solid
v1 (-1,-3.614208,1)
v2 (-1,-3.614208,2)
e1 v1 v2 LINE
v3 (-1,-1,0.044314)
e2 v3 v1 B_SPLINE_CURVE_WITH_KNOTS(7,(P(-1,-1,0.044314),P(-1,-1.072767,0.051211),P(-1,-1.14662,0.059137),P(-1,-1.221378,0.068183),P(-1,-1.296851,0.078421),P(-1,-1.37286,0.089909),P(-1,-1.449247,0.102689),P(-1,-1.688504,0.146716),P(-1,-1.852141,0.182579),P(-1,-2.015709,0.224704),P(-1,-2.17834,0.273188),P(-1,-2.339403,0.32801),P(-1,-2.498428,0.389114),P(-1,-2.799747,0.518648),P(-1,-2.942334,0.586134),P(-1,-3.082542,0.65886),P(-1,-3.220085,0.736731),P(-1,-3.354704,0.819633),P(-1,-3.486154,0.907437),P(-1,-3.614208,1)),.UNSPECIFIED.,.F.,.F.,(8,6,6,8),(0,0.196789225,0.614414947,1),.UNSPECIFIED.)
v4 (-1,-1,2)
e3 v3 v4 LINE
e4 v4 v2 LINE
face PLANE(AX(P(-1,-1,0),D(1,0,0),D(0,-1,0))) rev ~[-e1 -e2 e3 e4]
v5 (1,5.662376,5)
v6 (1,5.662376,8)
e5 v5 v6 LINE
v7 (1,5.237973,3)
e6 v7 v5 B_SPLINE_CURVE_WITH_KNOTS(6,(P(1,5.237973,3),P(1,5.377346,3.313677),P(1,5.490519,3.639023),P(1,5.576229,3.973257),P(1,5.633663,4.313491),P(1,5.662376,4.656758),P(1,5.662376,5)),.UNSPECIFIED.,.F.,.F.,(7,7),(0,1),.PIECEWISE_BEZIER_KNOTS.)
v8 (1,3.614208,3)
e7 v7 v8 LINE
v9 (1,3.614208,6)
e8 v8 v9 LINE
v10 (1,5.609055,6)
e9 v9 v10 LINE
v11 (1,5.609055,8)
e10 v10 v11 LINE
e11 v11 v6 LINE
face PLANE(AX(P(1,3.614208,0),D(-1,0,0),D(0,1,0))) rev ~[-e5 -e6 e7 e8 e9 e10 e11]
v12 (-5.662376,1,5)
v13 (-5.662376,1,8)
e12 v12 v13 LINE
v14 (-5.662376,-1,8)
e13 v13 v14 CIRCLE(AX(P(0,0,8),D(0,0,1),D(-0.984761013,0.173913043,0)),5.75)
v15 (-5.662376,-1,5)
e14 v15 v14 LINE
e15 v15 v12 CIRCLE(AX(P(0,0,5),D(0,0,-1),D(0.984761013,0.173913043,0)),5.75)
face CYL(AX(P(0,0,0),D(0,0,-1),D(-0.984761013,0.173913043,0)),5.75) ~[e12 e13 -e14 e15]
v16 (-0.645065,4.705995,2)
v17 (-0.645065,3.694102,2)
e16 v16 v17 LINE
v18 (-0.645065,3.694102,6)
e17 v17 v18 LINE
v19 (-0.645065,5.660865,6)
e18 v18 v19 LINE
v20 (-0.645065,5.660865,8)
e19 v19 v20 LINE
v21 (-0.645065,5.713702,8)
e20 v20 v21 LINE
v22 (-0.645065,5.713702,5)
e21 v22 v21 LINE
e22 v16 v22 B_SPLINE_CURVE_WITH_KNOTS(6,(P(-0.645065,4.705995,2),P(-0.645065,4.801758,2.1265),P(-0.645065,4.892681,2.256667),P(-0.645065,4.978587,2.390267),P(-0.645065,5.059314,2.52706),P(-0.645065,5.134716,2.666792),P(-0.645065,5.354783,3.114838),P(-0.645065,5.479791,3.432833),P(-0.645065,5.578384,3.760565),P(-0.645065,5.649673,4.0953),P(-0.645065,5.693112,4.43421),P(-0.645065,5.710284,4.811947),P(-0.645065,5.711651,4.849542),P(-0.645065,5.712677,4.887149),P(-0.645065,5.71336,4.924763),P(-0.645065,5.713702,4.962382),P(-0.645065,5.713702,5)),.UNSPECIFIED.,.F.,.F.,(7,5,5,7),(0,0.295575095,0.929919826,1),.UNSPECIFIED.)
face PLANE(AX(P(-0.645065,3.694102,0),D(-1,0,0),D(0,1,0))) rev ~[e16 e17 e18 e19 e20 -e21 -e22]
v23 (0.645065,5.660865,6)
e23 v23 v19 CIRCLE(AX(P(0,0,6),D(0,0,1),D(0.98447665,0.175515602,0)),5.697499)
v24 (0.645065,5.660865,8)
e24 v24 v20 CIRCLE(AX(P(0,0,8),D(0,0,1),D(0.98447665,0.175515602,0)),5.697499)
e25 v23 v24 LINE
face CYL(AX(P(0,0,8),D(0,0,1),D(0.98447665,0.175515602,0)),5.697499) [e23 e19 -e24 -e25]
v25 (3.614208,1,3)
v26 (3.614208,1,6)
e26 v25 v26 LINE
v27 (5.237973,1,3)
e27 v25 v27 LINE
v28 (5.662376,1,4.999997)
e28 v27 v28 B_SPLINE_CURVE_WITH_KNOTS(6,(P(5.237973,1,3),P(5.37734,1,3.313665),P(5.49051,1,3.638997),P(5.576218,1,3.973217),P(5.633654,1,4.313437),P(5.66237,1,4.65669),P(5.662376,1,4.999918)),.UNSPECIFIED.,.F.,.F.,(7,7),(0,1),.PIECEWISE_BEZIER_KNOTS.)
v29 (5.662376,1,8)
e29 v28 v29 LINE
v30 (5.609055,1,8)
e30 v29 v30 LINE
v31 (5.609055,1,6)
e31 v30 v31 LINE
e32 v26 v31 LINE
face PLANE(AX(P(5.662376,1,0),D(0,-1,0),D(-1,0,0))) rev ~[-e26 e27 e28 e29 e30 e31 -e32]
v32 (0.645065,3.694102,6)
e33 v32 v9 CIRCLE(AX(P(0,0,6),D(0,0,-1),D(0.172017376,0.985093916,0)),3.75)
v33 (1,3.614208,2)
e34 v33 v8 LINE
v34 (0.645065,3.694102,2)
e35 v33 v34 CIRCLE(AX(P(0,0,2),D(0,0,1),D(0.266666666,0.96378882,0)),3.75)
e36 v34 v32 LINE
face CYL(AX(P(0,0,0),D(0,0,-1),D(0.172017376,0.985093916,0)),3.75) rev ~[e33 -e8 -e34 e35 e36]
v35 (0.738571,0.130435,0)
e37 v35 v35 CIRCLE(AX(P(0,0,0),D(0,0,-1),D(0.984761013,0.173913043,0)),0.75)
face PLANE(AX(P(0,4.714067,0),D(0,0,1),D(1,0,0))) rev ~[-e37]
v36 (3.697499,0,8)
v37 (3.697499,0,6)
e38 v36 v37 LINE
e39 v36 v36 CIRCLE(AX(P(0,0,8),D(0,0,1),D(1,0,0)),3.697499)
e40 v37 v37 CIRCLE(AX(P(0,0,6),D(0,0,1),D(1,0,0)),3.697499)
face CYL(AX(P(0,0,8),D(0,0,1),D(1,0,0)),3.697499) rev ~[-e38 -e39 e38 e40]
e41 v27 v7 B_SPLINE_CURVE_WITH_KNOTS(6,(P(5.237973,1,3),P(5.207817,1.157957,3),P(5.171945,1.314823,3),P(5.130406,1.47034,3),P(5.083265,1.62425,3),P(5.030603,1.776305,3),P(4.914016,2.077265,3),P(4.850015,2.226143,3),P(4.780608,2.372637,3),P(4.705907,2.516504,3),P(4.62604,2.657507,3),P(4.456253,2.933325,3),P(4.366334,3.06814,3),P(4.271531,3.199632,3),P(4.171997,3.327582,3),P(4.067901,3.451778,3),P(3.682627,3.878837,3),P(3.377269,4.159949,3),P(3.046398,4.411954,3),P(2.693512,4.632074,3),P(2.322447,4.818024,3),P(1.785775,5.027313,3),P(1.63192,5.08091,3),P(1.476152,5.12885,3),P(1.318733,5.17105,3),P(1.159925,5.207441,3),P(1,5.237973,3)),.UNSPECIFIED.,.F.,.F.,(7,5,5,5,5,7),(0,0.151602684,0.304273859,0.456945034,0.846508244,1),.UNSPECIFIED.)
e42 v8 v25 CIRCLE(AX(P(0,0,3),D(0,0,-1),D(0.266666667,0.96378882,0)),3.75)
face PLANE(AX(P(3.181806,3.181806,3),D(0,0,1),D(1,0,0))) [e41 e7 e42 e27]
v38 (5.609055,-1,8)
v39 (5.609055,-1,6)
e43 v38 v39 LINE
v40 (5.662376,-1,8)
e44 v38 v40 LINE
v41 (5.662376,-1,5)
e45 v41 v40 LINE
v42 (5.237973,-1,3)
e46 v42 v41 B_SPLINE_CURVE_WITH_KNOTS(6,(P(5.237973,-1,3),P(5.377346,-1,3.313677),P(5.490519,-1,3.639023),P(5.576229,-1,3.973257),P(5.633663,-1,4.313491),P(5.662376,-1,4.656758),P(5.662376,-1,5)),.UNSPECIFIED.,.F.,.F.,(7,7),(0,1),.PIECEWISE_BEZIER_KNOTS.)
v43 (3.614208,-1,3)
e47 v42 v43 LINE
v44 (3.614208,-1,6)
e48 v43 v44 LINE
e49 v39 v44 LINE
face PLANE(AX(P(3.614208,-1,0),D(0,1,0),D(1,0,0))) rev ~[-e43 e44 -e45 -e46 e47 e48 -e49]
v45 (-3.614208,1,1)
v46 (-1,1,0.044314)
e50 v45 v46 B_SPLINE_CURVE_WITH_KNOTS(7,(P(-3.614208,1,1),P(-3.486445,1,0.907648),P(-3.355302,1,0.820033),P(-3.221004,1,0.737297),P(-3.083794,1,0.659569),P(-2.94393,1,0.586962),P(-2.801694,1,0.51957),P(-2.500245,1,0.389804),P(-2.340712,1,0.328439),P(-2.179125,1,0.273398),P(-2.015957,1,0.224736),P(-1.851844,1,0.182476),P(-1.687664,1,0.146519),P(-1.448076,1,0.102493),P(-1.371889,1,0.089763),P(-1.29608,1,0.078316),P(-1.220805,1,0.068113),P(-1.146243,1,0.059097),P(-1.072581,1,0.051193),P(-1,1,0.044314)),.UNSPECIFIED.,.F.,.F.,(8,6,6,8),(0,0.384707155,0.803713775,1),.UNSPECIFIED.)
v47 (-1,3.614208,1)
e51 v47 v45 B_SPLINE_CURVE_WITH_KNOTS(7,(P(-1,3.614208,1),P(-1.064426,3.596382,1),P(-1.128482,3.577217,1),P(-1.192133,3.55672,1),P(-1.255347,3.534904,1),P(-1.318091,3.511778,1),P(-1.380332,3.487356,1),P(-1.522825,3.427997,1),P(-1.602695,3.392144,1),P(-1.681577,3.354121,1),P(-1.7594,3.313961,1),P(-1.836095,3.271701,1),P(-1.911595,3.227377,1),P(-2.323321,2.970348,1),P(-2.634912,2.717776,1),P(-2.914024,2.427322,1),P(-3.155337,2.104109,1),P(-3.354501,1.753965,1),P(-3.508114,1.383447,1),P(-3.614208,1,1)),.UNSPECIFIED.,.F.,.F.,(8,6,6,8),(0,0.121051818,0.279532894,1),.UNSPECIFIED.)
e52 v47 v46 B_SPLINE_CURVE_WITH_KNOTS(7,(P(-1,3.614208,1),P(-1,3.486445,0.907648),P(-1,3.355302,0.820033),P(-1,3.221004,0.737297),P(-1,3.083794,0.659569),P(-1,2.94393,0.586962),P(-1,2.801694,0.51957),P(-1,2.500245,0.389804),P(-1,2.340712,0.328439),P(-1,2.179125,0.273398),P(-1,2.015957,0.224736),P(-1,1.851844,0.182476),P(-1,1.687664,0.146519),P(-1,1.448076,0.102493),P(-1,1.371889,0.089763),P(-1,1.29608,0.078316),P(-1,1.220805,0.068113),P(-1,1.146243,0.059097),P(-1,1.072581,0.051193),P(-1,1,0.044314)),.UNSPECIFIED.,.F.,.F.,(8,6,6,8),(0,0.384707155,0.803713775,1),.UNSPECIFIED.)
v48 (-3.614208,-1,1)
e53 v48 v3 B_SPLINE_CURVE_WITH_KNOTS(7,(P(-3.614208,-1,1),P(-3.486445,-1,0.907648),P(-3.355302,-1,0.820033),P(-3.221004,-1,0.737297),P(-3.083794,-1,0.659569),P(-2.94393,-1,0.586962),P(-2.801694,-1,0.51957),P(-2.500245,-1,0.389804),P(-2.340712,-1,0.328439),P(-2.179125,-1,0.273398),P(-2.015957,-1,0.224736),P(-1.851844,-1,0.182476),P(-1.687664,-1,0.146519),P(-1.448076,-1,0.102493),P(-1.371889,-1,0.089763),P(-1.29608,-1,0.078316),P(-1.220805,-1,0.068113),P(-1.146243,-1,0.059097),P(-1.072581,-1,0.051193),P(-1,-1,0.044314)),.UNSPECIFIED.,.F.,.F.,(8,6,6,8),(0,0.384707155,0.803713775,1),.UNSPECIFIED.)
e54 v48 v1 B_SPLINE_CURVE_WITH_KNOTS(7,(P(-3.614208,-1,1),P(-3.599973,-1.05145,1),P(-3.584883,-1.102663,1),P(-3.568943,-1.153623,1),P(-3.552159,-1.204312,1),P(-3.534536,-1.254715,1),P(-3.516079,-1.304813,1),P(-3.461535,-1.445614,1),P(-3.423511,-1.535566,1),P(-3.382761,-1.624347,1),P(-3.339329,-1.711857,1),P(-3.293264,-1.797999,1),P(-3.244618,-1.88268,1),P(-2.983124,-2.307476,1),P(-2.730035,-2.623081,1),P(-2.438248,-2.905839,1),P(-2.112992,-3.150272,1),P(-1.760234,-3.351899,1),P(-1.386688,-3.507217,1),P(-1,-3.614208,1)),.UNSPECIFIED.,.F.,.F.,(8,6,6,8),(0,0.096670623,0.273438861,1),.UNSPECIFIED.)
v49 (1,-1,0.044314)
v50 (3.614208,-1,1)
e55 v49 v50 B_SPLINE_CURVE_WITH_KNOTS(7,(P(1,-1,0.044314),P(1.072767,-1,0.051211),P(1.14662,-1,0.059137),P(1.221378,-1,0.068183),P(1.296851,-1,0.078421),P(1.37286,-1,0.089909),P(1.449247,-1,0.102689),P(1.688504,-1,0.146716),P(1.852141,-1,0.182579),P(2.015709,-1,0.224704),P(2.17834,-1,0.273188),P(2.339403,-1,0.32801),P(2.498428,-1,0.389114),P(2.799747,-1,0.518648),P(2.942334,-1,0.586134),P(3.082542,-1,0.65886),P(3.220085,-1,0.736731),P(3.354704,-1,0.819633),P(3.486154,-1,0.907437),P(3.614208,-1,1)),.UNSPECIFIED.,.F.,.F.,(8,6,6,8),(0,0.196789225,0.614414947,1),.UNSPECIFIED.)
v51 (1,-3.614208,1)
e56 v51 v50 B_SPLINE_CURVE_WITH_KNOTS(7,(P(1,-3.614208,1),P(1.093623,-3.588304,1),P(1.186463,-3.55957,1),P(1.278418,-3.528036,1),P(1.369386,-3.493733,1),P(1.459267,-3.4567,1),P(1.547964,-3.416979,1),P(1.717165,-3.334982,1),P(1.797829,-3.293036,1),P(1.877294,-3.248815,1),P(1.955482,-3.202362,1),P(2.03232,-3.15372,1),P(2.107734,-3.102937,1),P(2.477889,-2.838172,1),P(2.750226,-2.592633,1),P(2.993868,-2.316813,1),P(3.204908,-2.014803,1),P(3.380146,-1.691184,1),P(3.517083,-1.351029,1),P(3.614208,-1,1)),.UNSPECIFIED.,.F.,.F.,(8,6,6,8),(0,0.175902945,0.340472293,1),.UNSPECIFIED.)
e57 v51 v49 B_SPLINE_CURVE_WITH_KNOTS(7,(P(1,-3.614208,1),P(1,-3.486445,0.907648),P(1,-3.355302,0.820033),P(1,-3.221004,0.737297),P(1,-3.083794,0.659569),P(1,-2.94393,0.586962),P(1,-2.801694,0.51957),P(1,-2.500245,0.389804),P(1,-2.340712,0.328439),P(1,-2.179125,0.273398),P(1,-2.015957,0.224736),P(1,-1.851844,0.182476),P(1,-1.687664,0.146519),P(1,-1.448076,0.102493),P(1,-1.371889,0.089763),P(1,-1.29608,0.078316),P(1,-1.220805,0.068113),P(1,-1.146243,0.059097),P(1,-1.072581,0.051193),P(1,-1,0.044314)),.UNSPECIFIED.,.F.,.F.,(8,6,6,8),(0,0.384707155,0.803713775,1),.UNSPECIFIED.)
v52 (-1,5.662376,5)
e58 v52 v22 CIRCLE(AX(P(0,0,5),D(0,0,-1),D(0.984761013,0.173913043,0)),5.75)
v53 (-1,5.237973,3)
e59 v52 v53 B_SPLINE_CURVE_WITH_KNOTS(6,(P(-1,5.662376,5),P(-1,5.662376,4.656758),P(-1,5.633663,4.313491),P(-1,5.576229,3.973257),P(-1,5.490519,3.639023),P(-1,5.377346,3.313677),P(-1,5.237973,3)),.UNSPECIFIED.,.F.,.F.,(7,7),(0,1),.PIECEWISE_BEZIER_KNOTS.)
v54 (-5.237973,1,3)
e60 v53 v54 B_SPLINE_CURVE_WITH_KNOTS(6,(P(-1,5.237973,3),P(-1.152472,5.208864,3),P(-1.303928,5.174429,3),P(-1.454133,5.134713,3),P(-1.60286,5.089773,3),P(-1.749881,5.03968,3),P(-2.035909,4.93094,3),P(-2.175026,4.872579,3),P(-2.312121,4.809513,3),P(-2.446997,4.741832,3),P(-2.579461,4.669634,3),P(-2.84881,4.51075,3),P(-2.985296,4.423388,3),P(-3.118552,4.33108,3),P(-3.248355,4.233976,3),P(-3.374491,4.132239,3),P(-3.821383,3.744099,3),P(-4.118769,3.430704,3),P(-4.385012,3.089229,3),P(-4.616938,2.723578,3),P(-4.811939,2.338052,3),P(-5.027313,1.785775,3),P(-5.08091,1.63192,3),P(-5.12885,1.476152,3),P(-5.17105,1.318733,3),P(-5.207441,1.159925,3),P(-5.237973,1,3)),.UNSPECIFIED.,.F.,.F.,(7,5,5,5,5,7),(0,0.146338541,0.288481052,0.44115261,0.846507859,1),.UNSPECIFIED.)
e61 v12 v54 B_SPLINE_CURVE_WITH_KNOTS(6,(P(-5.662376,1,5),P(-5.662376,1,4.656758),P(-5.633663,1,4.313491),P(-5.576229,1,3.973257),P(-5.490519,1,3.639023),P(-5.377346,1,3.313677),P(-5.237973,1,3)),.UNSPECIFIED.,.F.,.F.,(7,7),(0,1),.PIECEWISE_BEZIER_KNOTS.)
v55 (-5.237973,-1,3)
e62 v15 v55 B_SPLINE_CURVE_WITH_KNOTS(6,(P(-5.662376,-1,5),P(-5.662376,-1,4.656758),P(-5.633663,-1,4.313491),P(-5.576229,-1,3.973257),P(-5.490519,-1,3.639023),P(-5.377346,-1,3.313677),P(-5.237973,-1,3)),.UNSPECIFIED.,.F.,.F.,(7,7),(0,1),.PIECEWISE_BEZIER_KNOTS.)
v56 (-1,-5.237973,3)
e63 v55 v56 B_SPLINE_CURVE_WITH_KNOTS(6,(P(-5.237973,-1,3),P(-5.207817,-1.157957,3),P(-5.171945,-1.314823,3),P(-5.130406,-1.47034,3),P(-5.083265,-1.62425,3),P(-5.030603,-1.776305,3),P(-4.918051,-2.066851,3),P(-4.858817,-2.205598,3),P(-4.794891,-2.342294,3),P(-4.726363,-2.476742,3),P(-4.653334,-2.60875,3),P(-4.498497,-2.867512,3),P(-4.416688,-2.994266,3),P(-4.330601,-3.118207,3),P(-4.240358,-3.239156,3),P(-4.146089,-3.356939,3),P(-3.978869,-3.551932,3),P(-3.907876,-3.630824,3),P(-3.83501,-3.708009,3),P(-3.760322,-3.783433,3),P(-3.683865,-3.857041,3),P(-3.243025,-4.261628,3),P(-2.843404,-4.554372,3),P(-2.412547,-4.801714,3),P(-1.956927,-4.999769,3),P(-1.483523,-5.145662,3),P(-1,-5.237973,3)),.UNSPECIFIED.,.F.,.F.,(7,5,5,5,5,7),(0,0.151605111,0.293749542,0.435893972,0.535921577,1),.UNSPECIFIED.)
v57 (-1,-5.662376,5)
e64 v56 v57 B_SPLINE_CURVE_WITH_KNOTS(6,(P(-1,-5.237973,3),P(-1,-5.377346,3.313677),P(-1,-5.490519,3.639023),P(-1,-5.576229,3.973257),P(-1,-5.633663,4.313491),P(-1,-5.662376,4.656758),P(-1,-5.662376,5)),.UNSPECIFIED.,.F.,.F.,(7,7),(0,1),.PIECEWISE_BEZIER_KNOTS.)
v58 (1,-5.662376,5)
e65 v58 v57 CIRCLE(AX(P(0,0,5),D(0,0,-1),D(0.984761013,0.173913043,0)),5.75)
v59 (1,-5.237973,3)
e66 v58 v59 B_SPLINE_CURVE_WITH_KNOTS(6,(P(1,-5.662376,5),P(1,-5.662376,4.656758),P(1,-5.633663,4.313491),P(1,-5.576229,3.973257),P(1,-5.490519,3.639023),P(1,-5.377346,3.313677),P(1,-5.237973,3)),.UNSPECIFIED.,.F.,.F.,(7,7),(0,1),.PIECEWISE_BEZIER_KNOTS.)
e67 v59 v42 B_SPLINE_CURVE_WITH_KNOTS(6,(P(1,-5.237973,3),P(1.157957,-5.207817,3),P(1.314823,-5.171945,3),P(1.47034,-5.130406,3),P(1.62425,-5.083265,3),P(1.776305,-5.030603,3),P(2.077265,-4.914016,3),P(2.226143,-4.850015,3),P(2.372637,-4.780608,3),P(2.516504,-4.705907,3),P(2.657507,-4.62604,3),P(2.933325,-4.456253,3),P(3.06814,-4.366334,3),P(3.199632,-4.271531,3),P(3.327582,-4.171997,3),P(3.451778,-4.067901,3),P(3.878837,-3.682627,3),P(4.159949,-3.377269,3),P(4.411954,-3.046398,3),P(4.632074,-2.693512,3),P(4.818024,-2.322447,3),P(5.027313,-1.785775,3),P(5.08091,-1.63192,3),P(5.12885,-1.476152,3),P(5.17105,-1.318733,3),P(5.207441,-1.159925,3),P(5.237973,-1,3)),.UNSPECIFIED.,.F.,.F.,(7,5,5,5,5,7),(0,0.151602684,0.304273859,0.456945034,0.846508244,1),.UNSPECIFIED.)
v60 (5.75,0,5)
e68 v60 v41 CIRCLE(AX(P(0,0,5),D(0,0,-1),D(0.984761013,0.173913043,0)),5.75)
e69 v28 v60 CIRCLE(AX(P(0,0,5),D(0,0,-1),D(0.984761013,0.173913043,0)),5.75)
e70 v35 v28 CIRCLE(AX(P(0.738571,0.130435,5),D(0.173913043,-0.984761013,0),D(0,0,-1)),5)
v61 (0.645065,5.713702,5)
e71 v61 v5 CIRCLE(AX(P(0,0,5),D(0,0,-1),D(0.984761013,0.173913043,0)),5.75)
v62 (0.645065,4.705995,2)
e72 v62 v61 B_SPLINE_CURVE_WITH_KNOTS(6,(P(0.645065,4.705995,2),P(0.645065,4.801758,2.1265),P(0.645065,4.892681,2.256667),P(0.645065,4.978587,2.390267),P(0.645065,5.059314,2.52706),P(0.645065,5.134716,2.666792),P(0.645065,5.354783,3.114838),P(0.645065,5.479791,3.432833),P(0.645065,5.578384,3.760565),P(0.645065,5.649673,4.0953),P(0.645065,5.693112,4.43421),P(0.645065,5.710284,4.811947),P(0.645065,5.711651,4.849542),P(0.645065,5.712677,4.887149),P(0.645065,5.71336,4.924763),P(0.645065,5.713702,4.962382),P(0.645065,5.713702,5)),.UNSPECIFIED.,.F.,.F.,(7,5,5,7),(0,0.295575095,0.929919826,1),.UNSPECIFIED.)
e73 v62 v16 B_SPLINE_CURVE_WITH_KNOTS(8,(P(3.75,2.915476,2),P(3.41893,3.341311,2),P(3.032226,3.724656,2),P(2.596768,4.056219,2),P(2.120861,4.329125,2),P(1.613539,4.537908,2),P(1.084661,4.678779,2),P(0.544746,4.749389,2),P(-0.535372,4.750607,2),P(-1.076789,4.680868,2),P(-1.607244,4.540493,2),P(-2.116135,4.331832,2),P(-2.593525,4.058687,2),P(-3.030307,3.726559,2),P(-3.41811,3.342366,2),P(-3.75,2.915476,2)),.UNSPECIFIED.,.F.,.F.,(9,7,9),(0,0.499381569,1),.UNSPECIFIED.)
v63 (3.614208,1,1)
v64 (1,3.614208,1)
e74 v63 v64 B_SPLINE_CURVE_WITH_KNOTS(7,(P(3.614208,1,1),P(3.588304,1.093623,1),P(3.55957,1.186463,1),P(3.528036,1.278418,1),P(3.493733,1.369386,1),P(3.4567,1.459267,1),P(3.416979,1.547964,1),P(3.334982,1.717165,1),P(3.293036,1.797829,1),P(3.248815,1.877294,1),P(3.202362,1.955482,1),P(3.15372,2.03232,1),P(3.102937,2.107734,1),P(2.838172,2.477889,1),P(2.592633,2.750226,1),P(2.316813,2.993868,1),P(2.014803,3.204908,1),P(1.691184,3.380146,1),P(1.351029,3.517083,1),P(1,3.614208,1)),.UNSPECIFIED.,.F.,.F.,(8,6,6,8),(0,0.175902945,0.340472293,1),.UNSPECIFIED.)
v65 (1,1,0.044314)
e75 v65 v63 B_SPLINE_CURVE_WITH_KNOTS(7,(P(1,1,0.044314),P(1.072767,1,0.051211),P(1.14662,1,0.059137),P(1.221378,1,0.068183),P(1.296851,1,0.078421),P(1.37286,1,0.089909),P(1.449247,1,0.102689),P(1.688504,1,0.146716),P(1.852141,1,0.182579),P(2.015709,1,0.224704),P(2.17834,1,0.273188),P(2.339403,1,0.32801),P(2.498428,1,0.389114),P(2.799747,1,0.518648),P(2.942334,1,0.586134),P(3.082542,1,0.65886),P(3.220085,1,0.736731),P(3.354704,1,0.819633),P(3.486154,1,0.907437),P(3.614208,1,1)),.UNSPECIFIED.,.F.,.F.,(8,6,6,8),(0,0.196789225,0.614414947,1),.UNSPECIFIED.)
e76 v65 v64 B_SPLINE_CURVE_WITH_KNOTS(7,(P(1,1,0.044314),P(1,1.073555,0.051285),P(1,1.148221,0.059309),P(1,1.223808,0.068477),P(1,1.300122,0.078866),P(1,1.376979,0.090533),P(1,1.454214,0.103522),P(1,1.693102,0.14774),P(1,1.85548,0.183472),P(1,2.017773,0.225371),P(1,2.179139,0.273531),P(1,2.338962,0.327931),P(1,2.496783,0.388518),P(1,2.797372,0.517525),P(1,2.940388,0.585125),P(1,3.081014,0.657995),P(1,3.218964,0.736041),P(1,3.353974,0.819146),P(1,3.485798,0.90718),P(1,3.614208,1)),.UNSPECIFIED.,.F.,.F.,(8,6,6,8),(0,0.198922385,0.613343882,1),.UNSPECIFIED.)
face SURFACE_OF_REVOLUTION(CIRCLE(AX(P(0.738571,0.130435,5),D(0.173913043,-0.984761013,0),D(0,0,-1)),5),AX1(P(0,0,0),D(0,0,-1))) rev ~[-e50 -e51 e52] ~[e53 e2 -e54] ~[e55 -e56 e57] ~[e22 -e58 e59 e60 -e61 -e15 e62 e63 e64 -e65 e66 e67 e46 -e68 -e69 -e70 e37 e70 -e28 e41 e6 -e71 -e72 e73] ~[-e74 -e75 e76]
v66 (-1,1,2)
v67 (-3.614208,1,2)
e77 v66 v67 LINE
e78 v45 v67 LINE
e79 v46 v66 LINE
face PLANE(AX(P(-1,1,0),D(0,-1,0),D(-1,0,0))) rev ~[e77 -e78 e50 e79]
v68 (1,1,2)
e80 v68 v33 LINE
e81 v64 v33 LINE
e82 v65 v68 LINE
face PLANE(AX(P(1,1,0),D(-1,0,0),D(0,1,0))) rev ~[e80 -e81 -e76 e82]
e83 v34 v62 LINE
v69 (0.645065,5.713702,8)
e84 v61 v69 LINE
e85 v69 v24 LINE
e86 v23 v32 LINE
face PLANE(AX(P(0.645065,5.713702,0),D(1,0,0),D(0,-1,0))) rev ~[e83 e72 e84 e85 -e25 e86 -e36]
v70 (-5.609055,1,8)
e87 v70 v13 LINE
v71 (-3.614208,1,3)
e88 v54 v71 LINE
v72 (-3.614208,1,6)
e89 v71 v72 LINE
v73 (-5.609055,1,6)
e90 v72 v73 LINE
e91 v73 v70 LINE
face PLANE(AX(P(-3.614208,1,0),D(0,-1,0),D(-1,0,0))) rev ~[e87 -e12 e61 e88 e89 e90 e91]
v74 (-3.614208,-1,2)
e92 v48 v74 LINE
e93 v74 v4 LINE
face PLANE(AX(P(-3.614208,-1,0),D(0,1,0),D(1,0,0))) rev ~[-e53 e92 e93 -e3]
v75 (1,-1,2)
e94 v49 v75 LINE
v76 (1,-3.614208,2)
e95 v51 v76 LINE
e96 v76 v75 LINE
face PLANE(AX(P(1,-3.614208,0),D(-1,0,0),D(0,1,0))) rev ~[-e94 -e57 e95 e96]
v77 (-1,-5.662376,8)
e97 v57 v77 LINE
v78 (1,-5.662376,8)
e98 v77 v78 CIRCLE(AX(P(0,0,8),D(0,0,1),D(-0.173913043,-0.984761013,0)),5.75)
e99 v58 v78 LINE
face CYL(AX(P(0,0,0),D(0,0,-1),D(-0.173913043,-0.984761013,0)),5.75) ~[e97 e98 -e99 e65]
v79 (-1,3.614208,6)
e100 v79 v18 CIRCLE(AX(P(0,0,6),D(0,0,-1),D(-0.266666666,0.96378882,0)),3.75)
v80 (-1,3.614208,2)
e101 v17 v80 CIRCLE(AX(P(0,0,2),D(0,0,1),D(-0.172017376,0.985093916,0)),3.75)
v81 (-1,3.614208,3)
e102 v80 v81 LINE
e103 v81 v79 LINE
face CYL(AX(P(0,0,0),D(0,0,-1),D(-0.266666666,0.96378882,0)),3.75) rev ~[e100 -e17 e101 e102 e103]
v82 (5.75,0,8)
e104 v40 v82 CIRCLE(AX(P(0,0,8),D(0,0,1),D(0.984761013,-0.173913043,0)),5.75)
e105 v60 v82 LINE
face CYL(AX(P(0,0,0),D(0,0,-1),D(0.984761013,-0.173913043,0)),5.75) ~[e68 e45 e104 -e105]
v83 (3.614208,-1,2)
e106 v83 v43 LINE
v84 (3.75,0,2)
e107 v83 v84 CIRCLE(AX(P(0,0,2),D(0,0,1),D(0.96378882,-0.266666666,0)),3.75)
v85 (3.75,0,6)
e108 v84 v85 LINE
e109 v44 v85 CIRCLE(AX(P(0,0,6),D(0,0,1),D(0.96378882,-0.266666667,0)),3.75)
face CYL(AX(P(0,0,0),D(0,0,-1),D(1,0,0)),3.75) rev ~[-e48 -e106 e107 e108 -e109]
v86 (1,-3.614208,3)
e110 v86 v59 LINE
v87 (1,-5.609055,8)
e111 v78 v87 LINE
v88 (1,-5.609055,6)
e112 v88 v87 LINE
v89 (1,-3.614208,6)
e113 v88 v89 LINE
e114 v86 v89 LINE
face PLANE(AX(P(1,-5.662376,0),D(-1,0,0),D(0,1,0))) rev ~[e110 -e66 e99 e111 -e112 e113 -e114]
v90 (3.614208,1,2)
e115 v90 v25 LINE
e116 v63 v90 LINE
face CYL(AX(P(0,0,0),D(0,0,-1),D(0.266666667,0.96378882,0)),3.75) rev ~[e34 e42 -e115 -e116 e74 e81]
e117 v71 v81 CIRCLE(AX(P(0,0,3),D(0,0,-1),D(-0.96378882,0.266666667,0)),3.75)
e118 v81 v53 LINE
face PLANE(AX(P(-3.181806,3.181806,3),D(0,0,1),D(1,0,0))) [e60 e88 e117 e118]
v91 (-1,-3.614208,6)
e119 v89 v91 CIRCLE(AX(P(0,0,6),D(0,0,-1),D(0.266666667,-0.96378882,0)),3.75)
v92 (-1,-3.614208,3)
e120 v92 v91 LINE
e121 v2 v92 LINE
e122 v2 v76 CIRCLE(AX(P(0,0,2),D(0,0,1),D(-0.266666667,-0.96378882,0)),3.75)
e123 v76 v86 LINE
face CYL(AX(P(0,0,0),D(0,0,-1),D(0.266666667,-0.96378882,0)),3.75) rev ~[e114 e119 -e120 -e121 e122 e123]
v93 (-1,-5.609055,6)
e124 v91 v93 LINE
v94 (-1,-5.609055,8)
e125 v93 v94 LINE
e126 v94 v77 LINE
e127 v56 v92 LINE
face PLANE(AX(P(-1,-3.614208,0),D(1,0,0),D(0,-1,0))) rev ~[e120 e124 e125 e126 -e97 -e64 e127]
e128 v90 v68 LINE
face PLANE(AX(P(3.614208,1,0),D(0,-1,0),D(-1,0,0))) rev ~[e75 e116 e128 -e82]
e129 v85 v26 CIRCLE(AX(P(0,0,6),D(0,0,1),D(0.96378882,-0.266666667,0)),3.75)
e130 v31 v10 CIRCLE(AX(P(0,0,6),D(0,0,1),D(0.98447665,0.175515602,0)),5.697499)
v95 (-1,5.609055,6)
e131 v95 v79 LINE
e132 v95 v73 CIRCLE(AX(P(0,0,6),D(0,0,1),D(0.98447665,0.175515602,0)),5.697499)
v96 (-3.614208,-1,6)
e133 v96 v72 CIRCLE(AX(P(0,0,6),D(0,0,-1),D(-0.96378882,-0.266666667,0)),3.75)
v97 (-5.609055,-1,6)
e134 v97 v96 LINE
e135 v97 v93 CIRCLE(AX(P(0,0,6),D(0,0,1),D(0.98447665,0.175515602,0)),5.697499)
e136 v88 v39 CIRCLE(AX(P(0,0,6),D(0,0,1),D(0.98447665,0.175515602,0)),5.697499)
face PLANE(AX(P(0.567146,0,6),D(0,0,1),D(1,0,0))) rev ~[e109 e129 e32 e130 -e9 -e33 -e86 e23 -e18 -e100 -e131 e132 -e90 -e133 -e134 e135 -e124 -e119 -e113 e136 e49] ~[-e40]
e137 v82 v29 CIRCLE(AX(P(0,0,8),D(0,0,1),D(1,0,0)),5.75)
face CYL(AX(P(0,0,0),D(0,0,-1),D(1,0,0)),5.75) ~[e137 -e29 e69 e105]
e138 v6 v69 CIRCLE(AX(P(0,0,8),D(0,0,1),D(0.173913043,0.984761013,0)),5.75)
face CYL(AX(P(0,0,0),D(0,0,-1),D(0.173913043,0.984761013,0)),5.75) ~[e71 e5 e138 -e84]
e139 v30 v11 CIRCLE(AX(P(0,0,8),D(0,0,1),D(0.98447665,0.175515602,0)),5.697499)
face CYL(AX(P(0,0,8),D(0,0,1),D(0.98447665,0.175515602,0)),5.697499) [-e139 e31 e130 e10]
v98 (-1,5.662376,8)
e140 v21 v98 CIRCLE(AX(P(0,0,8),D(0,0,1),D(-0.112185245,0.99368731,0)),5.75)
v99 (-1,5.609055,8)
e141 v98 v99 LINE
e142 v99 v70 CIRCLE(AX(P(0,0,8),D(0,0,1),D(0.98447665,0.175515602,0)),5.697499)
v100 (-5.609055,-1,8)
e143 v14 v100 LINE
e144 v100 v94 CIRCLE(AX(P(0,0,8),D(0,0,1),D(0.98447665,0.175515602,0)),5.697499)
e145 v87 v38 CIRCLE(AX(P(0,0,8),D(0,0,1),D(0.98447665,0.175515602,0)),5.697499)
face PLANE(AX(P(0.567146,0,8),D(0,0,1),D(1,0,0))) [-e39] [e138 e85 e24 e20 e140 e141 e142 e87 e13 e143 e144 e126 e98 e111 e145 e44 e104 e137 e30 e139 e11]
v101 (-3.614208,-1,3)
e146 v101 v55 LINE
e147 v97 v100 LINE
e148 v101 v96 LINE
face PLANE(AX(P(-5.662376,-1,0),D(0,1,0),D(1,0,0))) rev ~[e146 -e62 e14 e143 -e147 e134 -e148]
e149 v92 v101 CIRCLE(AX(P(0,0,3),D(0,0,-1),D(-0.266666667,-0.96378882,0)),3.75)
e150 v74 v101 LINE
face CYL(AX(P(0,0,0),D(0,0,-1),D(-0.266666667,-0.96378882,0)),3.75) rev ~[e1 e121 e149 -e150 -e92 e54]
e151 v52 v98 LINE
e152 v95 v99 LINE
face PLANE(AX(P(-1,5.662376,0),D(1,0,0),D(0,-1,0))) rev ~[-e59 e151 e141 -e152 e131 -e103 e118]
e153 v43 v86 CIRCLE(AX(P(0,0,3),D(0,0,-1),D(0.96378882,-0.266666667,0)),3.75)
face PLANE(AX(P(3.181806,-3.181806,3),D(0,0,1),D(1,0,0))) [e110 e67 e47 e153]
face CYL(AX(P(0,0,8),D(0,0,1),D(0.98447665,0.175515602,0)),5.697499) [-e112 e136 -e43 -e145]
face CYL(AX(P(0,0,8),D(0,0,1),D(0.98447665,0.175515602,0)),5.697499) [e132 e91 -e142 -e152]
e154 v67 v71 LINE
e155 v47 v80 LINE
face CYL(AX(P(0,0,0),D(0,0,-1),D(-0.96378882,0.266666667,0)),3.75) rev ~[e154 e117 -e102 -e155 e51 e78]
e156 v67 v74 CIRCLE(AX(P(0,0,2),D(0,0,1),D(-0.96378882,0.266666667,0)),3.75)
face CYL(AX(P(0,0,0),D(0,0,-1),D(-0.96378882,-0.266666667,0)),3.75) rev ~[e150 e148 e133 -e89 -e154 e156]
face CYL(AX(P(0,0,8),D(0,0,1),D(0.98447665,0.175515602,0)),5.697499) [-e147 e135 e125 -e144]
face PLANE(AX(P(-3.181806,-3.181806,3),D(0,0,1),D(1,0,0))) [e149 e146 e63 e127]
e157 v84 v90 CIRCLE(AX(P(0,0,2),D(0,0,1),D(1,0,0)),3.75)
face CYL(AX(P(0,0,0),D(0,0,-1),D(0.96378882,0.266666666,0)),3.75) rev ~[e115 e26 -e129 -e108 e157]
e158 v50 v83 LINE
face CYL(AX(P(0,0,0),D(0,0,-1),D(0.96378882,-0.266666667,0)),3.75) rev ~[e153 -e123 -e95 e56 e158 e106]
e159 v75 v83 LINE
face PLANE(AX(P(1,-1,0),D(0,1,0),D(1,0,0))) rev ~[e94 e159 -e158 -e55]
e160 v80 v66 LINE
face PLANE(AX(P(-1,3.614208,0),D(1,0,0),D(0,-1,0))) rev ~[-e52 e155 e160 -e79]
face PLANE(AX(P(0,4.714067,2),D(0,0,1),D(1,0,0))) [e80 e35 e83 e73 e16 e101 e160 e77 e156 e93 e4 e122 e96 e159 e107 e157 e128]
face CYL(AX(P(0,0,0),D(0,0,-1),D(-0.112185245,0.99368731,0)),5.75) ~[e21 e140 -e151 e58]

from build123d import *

# Parameters (mm, degrees)
F1_DEPTH = 3
F2_DEPTH = 8
F0_W     = 2
F0_H     = 2
F3_DEPTH = 2
F4_R     = 3.6974991887
F5_DEPTH = 2


# Not quite as in the source:
# - a fillet or chamfer that OpenCascade refuses, or shapes differently, is made with other operations: its cross-section is extruded or revolved along the edge and cut away or added


with BuildPart() as f1:
    # F0 (on Top) → F1 (new body)
    with BuildSketch(Plane.XY):
        with BuildLine():
            Line((3.7669987963, -1), (3.6142080737, -1))
            ThreePointArc((3.6142080737, -1), (2.6516504294, -2.6516504294), (1, -3.6142080737))
            Line((1, -3.6142080737), (1, -5.6623758265))
            ThreePointArc((1, -5.6623758265), (4.0658639918, -4.0658639918), (5.6623758265, -1))
            Line((5.6623758265, -1), (3.7669987963, -1))
        make_face()
    extrude(amount=F1_DEPTH)



with BuildPart() as f1b:
    # F0 (on Top) → F1, piece 2 (new body)
    with BuildSketch(Plane.XY):
        with BuildLine():
            Line((-1, -5.6623758265), (-1, -3.6142080737))
            ThreePointArc((-1, -3.6142080737), (-2.6516504294, -2.6516504294), (-3.6142080737, -1))
            Line((-3.6142080737, -1), (-5.6623758265, -1))
            ThreePointArc((-5.6623758265, -1), (-4.0658639918, -4.0658639918), (-1, -5.6623758265))
        make_face()
    extrude(amount=F1_DEPTH)


with BuildPart() as f1c:
    # F0 (on Top) → F1, piece 3 (new body)
    with BuildSketch(Plane.XY):
        with BuildLine():
            ThreePointArc((-3.6142080737, 1), (-2.6516504294, 2.6516504294), (-1, 3.6142080737))
            Line((-1, 3.6142080737), (-1, 5.6623758265))
            ThreePointArc((-1, 5.6623758265), (-4.0658639918, 4.0658639918), (-5.6623758265, 1))
            Line((-5.6623758265, 1), (-3.6142080737, 1))
        make_face()
    extrude(amount=F1_DEPTH)


with BuildPart() as f1d:
    # F0 (on Top) → F1, piece 4 (new body)
    with BuildSketch(Plane.XY):
        with BuildLine():
            ThreePointArc((1, 3.6142080737), (2.6516504294, 2.6516504294), (3.6142080737, 1))
            Line((3.6142080737, 1), (5.6623758265, 1))
            ThreePointArc((5.6623758265, 1), (4.0658639918, 4.0658639918), (1, 5.6623758265))
            Line((1, 5.6623758265), (1, 3.6142080737))
        make_face()
    extrude(amount=F1_DEPTH)


with BuildPart() as f1_1:
    add(f1.part)

    add(f1b.part)  # F2 merges F1b

    add(f1c.part)  # F2 merges F1c

    add(f1d.part)  # F2 merges F1d
    # F0 (on Top) → F2 (join)
    with BuildSketch(Plane.XY):
        with BuildLine():
            ThreePointArc((0.6450651563, 3.6941021838), (0.8235020396, 3.6584620253), (1, 3.6142080737))
            Line((1, 3.6142080737), (1, 5.6623758265))
            ThreePointArc((1, 5.6623758265), (0.8229328266, 5.6908067585), (0.6450651563, 5.7137020349))
            Line((0.6450651563, 5.7137020349), (0.6450651563, 3.6941021838))
        make_face()
        with BuildLine():
            ThreePointArc((-1, 3.6142080737), (-0.8235020396, 3.6584620253), (-0.6450651563, 3.6941021838))
            Line((-0.6450651563, 3.6941021838), (-0.6450651563, 5.7137020349))
            ThreePointArc((-0.6450651563, 5.7137020349), (-0.8229328266, 5.6908067585), (-1, 5.6623758265))
            Line((-1, 5.6623758265), (-1, 3.6142080737))
        make_face()
        with BuildLine():
            ThreePointArc((-3.6142080737, -1), (-3.75, 0), (-3.6142080737, 1))
            Line((-3.6142080737, 1), (-5.6623758265, 1))
            ThreePointArc((-5.6623758265, 1), (-5.75, 0), (-5.6623758265, -1))
            Line((-5.6623758265, -1), (-3.6142080737, -1))
        make_face()
        with BuildLine():
            ThreePointArc((3.6142080737, 1), (3.7158969493, 0.5045888047), (3.75, 0))
            ThreePointArc((3.75, 0), (3.7158969493, -0.5045888047), (3.6142080737, -1))
            Line((3.6142080737, -1), (3.7669987963, -1))
            Line((3.7669987963, -1), (5.6623758265, -1))
            ThreePointArc((5.6623758265, -1), (5.7280520686, -0.5019158285), (5.75, 0))
            ThreePointArc((5.75, 0), (5.7280520686, 0.5019158285), (5.6623758265, 1))
            Line((5.6623758265, 1), (3.6142080737, 1))
        make_face()
        with BuildLine():
            Line((1, -5.6623758265), (1, -3.6142080737))
            ThreePointArc((1, -3.6142080737), (0, -3.75), (-1, -3.6142080737))
            Line((-1, -3.6142080737), (-1, -5.6623758265))
            ThreePointArc((-1, -5.6623758265), (0, -5.75), (1, -5.6623758265))
        make_face()
    extrude(amount=F2_DEPTH)

    # F0 (on Top) → F3 (join)
    with BuildSketch(Plane.XY):
        with BuildLine():
            ThreePointArc((-0.6450651563, 3.6941021838), (0, 3.75), (0.6450651563, 3.6941021838))
            Line((0.6450651563, 3.6941021838), (0.6450651563, 5.7137020349))
            ThreePointArc((0.6450651563, 5.7137020349), (0, 5.75), (-0.6450651563, 5.7137020349))
            Line((-0.6450651563, 5.7137020349), (-0.6450651563, 3.6941021838))
        make_face()
        with BuildLine():
            Line((0.6450651563, 3.1745089218), (0.6450651563, 3.6941021838))
            ThreePointArc((0.6450651563, 3.6941021838), (0, 3.75), (-0.6450651563, 3.6941021838))
            Line((-0.6450651563, 3.6941021838), (-0.6450651563, 3.1745089218))
            Line((-0.6450651563, 3.1745089218), (0.6450651563, 3.1745089218))
        make_face()
        with BuildLine():
            Line((1, 1), (1, 3.6142080737))
            ThreePointArc((1, 3.6142080737), (0.8235020396, 3.6584620253), (0.6450651563, 3.6941021838))
            Line((0.6450651563, 3.6941021838), (0.6450651563, 3.1745089218))
            Line((0.6450651563, 3.1745089218), (-0.6450651563, 3.1745089218))
            Line((-0.6450651563, 3.1745089218), (-0.6450651563, 3.6941021838))
            ThreePointArc((-0.6450651563, 3.6941021838), (-0.8235020396, 3.6584620253), (-1, 3.6142080737))
            Line((-1, 3.6142080737), (-1, 1))
            Line((-1, 1), (1, 1))
        make_face()
        with BuildLine():
            Line((-1, -1), (-1, 1))
            Line((-1, 1), (-3.6142080737, 1))
            ThreePointArc((-3.6142080737, 1), (-3.75, 0), (-3.6142080737, -1))
            Line((-3.6142080737, -1), (-1, -1))
        make_face()
        with BuildLine():
            ThreePointArc((3.6142080737, -1), (3.7158969493, -0.5045888047), (3.75, 0))
            ThreePointArc((3.75, 0), (3.7158969493, 0.5045888047), (3.6142080737, 1))
            Line((3.6142080737, 1), (1, 1))
            Line((1, 1), (1, -1))
            Line((1, -1), (3.6142080737, -1))
        make_face()
        Rectangle(F0_W, F0_H)
        with BuildLine():
            ThreePointArc((-1, -3.6142080737), (0, -3.75), (1, -3.6142080737))
            Line((1, -3.6142080737), (1, -1))
            Line((1, -1), (-1, -1))
            Line((-1, -1), (-1, -3.6142080737))
        make_face()
    extrude(amount=F3_DEPTH)

    # F4 (on face) → F5 (join)
    with BuildSketch(Plane.XY.offset(8)):
        with BuildLine():
            Line((3.6142080737, 1), (5.609054912, 1))
            ThreePointArc((5.609054912, 1), (-5.6974991887, 0), (5.609054912, -1))
            Line((5.609054912, -1), (3.6142080737, -1))
            ThreePointArc((3.6142080737, -1), (3.75, 0), (3.6142080737, 1))
        make_face()
        Circle(F4_R, mode=Mode.SUBTRACT)
    extrude(amount=-F5_DEPTH)

    # F6: fillet of radius 5 on 1 edges, made by hand

    # F6_s1 → F6_t2 (revolve, cut)
    with BuildSketch(Plane(origin=(0, 0, 0), x_dir=(0, 0, 1), z_dir=(-0.1739130435, 0.9847610133, 0))):
        with BuildLine():
            ThreePointArc((0, 0.75), (1.4644660941, 4.2855339059), (5, 5.75))
            Line((5, 5.75), (0, 5.75))
            Line((0, 5.75), (0, 0.75))
        make_face()
    revolve(axis=Axis((0, 0, 0), (0, 0, -1)), mode=Mode.SUBTRACT)


solid = f1_1.part
